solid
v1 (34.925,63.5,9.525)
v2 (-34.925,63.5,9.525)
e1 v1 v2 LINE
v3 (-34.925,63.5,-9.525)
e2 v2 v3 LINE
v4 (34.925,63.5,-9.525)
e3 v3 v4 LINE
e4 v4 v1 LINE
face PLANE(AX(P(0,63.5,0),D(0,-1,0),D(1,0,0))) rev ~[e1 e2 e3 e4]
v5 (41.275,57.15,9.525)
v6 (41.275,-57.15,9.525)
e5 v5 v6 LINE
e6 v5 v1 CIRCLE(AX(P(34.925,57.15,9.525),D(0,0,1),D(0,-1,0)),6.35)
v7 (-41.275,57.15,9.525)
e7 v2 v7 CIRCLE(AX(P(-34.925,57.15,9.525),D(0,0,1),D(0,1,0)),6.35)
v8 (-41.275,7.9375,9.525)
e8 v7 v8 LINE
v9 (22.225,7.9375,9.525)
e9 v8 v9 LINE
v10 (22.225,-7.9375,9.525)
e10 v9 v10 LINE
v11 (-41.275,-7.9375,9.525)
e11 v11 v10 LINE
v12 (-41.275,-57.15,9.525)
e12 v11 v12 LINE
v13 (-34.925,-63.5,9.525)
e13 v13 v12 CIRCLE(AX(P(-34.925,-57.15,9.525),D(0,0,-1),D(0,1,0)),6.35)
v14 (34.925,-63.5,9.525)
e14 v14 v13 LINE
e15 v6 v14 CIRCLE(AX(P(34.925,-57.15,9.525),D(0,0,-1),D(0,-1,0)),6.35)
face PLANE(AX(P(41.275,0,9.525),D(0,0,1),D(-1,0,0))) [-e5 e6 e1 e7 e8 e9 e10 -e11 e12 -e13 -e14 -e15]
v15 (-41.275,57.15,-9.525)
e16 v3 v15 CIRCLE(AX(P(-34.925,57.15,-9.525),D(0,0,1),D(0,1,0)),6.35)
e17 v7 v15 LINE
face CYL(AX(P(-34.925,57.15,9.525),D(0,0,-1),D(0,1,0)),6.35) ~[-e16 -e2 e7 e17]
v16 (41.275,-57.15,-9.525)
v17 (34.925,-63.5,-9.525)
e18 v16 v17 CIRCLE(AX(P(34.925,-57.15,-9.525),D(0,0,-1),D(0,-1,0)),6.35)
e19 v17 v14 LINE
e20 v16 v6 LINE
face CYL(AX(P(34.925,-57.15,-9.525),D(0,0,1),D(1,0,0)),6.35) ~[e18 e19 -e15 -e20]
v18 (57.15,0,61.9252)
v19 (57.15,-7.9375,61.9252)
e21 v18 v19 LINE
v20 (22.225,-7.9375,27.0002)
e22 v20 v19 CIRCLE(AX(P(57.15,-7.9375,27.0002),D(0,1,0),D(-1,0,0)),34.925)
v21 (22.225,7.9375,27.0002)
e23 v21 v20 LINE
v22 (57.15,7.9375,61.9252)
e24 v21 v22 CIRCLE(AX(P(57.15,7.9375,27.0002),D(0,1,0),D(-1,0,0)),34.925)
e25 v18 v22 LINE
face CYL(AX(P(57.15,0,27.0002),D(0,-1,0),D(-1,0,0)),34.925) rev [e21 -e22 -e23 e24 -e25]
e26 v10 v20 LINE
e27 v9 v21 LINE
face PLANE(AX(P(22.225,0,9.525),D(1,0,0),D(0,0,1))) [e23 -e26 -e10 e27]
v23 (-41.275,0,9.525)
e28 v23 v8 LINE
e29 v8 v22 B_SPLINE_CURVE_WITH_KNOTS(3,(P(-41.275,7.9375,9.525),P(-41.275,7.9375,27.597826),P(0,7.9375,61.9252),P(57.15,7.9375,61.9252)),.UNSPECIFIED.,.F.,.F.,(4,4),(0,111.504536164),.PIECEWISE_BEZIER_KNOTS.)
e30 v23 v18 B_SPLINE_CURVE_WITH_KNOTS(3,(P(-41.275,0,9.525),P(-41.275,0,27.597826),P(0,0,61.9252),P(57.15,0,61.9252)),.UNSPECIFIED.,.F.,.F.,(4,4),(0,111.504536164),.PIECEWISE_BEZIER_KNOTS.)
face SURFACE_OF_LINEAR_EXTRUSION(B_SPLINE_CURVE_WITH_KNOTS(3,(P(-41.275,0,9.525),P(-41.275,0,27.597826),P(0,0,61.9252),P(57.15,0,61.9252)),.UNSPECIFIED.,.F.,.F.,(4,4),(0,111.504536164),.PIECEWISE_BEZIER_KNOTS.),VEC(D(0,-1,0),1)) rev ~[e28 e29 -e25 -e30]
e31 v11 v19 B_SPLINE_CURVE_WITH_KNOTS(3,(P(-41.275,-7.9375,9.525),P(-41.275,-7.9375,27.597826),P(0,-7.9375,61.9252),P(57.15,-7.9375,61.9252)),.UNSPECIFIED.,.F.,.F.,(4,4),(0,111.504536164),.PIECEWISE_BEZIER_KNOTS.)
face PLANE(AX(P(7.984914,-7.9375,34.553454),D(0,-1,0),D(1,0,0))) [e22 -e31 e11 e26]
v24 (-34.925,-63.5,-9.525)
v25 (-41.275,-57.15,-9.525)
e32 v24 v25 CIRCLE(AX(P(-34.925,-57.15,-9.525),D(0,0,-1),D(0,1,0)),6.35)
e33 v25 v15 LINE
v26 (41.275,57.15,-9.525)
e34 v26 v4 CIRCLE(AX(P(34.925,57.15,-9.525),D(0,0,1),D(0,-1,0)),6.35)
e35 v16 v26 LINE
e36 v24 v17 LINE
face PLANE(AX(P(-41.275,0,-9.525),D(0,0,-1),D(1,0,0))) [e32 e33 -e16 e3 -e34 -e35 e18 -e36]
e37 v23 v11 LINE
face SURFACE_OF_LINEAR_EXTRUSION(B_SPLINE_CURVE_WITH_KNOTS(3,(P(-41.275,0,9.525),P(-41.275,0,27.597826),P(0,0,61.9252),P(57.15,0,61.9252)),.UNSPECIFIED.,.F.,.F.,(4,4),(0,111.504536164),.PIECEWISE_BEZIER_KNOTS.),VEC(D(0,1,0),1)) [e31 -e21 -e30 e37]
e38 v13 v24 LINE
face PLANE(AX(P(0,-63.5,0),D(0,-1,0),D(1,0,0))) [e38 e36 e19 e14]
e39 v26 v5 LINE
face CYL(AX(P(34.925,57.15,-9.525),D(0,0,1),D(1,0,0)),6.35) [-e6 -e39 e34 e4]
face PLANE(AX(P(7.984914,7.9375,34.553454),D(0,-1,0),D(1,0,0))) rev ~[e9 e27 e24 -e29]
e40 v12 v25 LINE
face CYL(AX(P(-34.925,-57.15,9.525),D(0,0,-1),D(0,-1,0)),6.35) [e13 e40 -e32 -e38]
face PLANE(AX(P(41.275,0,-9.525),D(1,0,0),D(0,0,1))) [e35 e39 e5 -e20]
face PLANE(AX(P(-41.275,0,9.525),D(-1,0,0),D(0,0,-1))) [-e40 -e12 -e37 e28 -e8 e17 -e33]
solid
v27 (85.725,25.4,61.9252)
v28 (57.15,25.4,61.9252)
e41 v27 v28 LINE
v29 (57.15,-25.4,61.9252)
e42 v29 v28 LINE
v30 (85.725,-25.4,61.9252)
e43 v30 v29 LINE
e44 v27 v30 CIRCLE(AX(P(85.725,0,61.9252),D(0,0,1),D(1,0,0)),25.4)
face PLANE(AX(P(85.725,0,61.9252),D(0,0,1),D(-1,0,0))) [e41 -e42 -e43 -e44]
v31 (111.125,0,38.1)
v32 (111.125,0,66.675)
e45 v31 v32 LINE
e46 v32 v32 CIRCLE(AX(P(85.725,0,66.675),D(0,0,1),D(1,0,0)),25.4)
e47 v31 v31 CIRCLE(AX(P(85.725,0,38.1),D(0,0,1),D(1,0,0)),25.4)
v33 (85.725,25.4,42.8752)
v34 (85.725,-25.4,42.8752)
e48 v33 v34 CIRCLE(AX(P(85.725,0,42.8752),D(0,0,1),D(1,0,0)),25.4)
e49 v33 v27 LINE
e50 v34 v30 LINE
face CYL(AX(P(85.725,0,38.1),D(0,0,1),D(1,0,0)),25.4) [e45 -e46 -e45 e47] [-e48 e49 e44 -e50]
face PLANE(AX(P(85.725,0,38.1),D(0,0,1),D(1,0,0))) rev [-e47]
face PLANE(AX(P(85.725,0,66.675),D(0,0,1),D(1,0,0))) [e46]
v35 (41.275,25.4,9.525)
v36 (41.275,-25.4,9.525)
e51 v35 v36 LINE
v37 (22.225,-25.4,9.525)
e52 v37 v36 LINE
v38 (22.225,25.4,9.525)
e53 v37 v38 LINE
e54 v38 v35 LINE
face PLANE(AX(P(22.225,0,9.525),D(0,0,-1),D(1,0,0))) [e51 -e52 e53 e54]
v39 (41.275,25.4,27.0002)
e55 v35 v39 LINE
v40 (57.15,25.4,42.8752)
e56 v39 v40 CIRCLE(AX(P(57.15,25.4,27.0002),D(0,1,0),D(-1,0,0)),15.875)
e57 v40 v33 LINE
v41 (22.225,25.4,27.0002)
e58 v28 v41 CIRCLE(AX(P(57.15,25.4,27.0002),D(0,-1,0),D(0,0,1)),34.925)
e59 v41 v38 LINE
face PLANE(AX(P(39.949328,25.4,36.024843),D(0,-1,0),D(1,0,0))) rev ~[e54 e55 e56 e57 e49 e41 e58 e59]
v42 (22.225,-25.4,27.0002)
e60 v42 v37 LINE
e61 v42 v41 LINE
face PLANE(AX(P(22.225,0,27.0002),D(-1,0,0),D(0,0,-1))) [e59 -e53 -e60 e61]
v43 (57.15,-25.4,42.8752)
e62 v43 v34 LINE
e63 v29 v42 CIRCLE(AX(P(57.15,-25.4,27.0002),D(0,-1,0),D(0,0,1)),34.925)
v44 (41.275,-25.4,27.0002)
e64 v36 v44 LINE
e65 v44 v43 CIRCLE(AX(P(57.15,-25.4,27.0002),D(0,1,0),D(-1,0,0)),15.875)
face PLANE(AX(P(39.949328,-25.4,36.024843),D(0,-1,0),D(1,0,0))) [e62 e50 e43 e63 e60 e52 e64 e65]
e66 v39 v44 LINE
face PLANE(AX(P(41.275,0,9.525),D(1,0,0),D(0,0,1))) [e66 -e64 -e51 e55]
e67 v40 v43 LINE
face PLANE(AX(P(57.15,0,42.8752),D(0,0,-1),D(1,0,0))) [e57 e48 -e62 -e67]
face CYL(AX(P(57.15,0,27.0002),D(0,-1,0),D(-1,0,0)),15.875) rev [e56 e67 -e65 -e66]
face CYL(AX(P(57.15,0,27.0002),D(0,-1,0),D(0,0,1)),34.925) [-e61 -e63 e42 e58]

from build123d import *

# Parameters (mm, degrees)
F1_DEPTH = 63.5
F0_W     = 25.4
F0_H     = 19.05
F2_DEPTH = 25.4
F3_DEPTH = 7.9375
F5_R     = 6.35


with BuildPart() as f1:
    # F0 (on Front) → F1 (new body, symmetric)
    with BuildSketch(Plane.XZ):
        Polygon((41.275, -9.525), (41.275, 9.525), (22.225, 9.525), (-41.275, 9.525), (-41.275, -9.525), align=None)
    extrude(amount=F1_DEPTH, both=True)

    # F0 (on Front) → F3 (join, symmetric)
    with BuildSketch(Plane.XZ):
        with BuildLine():
            Line((-41.275, 9.525), (22.225, 9.525))
            Line((22.225, 9.525), (22.225, 27.0002))
            ThreePointArc((22.225, 27.0002), (32.4542956671, 51.6959043329), (57.15, 61.9252))
            add(Edge.make_bspline(
                [(-41.275, 9.525), (-41.275, 27.5978259742), (0, 61.9252), (57.15, 61.9252)],
                knots=[0, 0, 0, 0, 111.5045361635, 111.5045361635, 111.5045361635, 111.5045361635], degree=3))
        make_face()
    extrude(amount=F3_DEPTH, both=True)

    # F5
    f5_edges = [f1.edges().sort_by_distance(p)[0] for p in [
        (41.275, -63.5, 0),
        (-41.275, -63.5, 0),
        (41.275, 63.5, 0),
        (-41.275, 63.5, 0),
    ]]
    fillet(f5_edges, radius=F5_R)


with BuildPart() as f2:
    # F0 (on Front) → F2 (new body, symmetric)
    with BuildSketch(Plane.XZ):
        with BuildLine():
            Line((22.225, 9.525), (41.275, 9.525))
            Line((41.275, 9.525), (41.275, 27.0002))
            ThreePointArc((41.275, 27.0002), (45.9246798487, 38.2255201513), (57.15, 42.8752))
            Line((57.15, 42.8752), (60.325, 42.8752))
            Line((60.325, 42.8752), (60.325, 61.9252))
            Line((60.325, 61.9252), (57.15, 61.9252))
            ThreePointArc((57.15, 61.9252), (32.4542956671, 51.6959043329), (22.225, 27.0002))
            Line((22.225, 27.0002), (22.225, 9.525))
        make_face()
        with Locations((73.025, 52.4002)):
            Rectangle(F0_W, F0_H)
    extrude(amount=F2_DEPTH, both=True)

    # F0 (on Front) → F4 (revolve)
    with BuildSketch(Plane.XZ):
        Polygon((85.725, 61.9252), (85.725, 42.8752), (85.725, 38.1), (111.125, 38.1), (111.125, 66.675), (85.725, 66.675), align=None)
    revolve(axis=Axis((85.725, 0, 52.3875), (0, 0, 1)))


solid = Compound([f1.part, f2.part])
